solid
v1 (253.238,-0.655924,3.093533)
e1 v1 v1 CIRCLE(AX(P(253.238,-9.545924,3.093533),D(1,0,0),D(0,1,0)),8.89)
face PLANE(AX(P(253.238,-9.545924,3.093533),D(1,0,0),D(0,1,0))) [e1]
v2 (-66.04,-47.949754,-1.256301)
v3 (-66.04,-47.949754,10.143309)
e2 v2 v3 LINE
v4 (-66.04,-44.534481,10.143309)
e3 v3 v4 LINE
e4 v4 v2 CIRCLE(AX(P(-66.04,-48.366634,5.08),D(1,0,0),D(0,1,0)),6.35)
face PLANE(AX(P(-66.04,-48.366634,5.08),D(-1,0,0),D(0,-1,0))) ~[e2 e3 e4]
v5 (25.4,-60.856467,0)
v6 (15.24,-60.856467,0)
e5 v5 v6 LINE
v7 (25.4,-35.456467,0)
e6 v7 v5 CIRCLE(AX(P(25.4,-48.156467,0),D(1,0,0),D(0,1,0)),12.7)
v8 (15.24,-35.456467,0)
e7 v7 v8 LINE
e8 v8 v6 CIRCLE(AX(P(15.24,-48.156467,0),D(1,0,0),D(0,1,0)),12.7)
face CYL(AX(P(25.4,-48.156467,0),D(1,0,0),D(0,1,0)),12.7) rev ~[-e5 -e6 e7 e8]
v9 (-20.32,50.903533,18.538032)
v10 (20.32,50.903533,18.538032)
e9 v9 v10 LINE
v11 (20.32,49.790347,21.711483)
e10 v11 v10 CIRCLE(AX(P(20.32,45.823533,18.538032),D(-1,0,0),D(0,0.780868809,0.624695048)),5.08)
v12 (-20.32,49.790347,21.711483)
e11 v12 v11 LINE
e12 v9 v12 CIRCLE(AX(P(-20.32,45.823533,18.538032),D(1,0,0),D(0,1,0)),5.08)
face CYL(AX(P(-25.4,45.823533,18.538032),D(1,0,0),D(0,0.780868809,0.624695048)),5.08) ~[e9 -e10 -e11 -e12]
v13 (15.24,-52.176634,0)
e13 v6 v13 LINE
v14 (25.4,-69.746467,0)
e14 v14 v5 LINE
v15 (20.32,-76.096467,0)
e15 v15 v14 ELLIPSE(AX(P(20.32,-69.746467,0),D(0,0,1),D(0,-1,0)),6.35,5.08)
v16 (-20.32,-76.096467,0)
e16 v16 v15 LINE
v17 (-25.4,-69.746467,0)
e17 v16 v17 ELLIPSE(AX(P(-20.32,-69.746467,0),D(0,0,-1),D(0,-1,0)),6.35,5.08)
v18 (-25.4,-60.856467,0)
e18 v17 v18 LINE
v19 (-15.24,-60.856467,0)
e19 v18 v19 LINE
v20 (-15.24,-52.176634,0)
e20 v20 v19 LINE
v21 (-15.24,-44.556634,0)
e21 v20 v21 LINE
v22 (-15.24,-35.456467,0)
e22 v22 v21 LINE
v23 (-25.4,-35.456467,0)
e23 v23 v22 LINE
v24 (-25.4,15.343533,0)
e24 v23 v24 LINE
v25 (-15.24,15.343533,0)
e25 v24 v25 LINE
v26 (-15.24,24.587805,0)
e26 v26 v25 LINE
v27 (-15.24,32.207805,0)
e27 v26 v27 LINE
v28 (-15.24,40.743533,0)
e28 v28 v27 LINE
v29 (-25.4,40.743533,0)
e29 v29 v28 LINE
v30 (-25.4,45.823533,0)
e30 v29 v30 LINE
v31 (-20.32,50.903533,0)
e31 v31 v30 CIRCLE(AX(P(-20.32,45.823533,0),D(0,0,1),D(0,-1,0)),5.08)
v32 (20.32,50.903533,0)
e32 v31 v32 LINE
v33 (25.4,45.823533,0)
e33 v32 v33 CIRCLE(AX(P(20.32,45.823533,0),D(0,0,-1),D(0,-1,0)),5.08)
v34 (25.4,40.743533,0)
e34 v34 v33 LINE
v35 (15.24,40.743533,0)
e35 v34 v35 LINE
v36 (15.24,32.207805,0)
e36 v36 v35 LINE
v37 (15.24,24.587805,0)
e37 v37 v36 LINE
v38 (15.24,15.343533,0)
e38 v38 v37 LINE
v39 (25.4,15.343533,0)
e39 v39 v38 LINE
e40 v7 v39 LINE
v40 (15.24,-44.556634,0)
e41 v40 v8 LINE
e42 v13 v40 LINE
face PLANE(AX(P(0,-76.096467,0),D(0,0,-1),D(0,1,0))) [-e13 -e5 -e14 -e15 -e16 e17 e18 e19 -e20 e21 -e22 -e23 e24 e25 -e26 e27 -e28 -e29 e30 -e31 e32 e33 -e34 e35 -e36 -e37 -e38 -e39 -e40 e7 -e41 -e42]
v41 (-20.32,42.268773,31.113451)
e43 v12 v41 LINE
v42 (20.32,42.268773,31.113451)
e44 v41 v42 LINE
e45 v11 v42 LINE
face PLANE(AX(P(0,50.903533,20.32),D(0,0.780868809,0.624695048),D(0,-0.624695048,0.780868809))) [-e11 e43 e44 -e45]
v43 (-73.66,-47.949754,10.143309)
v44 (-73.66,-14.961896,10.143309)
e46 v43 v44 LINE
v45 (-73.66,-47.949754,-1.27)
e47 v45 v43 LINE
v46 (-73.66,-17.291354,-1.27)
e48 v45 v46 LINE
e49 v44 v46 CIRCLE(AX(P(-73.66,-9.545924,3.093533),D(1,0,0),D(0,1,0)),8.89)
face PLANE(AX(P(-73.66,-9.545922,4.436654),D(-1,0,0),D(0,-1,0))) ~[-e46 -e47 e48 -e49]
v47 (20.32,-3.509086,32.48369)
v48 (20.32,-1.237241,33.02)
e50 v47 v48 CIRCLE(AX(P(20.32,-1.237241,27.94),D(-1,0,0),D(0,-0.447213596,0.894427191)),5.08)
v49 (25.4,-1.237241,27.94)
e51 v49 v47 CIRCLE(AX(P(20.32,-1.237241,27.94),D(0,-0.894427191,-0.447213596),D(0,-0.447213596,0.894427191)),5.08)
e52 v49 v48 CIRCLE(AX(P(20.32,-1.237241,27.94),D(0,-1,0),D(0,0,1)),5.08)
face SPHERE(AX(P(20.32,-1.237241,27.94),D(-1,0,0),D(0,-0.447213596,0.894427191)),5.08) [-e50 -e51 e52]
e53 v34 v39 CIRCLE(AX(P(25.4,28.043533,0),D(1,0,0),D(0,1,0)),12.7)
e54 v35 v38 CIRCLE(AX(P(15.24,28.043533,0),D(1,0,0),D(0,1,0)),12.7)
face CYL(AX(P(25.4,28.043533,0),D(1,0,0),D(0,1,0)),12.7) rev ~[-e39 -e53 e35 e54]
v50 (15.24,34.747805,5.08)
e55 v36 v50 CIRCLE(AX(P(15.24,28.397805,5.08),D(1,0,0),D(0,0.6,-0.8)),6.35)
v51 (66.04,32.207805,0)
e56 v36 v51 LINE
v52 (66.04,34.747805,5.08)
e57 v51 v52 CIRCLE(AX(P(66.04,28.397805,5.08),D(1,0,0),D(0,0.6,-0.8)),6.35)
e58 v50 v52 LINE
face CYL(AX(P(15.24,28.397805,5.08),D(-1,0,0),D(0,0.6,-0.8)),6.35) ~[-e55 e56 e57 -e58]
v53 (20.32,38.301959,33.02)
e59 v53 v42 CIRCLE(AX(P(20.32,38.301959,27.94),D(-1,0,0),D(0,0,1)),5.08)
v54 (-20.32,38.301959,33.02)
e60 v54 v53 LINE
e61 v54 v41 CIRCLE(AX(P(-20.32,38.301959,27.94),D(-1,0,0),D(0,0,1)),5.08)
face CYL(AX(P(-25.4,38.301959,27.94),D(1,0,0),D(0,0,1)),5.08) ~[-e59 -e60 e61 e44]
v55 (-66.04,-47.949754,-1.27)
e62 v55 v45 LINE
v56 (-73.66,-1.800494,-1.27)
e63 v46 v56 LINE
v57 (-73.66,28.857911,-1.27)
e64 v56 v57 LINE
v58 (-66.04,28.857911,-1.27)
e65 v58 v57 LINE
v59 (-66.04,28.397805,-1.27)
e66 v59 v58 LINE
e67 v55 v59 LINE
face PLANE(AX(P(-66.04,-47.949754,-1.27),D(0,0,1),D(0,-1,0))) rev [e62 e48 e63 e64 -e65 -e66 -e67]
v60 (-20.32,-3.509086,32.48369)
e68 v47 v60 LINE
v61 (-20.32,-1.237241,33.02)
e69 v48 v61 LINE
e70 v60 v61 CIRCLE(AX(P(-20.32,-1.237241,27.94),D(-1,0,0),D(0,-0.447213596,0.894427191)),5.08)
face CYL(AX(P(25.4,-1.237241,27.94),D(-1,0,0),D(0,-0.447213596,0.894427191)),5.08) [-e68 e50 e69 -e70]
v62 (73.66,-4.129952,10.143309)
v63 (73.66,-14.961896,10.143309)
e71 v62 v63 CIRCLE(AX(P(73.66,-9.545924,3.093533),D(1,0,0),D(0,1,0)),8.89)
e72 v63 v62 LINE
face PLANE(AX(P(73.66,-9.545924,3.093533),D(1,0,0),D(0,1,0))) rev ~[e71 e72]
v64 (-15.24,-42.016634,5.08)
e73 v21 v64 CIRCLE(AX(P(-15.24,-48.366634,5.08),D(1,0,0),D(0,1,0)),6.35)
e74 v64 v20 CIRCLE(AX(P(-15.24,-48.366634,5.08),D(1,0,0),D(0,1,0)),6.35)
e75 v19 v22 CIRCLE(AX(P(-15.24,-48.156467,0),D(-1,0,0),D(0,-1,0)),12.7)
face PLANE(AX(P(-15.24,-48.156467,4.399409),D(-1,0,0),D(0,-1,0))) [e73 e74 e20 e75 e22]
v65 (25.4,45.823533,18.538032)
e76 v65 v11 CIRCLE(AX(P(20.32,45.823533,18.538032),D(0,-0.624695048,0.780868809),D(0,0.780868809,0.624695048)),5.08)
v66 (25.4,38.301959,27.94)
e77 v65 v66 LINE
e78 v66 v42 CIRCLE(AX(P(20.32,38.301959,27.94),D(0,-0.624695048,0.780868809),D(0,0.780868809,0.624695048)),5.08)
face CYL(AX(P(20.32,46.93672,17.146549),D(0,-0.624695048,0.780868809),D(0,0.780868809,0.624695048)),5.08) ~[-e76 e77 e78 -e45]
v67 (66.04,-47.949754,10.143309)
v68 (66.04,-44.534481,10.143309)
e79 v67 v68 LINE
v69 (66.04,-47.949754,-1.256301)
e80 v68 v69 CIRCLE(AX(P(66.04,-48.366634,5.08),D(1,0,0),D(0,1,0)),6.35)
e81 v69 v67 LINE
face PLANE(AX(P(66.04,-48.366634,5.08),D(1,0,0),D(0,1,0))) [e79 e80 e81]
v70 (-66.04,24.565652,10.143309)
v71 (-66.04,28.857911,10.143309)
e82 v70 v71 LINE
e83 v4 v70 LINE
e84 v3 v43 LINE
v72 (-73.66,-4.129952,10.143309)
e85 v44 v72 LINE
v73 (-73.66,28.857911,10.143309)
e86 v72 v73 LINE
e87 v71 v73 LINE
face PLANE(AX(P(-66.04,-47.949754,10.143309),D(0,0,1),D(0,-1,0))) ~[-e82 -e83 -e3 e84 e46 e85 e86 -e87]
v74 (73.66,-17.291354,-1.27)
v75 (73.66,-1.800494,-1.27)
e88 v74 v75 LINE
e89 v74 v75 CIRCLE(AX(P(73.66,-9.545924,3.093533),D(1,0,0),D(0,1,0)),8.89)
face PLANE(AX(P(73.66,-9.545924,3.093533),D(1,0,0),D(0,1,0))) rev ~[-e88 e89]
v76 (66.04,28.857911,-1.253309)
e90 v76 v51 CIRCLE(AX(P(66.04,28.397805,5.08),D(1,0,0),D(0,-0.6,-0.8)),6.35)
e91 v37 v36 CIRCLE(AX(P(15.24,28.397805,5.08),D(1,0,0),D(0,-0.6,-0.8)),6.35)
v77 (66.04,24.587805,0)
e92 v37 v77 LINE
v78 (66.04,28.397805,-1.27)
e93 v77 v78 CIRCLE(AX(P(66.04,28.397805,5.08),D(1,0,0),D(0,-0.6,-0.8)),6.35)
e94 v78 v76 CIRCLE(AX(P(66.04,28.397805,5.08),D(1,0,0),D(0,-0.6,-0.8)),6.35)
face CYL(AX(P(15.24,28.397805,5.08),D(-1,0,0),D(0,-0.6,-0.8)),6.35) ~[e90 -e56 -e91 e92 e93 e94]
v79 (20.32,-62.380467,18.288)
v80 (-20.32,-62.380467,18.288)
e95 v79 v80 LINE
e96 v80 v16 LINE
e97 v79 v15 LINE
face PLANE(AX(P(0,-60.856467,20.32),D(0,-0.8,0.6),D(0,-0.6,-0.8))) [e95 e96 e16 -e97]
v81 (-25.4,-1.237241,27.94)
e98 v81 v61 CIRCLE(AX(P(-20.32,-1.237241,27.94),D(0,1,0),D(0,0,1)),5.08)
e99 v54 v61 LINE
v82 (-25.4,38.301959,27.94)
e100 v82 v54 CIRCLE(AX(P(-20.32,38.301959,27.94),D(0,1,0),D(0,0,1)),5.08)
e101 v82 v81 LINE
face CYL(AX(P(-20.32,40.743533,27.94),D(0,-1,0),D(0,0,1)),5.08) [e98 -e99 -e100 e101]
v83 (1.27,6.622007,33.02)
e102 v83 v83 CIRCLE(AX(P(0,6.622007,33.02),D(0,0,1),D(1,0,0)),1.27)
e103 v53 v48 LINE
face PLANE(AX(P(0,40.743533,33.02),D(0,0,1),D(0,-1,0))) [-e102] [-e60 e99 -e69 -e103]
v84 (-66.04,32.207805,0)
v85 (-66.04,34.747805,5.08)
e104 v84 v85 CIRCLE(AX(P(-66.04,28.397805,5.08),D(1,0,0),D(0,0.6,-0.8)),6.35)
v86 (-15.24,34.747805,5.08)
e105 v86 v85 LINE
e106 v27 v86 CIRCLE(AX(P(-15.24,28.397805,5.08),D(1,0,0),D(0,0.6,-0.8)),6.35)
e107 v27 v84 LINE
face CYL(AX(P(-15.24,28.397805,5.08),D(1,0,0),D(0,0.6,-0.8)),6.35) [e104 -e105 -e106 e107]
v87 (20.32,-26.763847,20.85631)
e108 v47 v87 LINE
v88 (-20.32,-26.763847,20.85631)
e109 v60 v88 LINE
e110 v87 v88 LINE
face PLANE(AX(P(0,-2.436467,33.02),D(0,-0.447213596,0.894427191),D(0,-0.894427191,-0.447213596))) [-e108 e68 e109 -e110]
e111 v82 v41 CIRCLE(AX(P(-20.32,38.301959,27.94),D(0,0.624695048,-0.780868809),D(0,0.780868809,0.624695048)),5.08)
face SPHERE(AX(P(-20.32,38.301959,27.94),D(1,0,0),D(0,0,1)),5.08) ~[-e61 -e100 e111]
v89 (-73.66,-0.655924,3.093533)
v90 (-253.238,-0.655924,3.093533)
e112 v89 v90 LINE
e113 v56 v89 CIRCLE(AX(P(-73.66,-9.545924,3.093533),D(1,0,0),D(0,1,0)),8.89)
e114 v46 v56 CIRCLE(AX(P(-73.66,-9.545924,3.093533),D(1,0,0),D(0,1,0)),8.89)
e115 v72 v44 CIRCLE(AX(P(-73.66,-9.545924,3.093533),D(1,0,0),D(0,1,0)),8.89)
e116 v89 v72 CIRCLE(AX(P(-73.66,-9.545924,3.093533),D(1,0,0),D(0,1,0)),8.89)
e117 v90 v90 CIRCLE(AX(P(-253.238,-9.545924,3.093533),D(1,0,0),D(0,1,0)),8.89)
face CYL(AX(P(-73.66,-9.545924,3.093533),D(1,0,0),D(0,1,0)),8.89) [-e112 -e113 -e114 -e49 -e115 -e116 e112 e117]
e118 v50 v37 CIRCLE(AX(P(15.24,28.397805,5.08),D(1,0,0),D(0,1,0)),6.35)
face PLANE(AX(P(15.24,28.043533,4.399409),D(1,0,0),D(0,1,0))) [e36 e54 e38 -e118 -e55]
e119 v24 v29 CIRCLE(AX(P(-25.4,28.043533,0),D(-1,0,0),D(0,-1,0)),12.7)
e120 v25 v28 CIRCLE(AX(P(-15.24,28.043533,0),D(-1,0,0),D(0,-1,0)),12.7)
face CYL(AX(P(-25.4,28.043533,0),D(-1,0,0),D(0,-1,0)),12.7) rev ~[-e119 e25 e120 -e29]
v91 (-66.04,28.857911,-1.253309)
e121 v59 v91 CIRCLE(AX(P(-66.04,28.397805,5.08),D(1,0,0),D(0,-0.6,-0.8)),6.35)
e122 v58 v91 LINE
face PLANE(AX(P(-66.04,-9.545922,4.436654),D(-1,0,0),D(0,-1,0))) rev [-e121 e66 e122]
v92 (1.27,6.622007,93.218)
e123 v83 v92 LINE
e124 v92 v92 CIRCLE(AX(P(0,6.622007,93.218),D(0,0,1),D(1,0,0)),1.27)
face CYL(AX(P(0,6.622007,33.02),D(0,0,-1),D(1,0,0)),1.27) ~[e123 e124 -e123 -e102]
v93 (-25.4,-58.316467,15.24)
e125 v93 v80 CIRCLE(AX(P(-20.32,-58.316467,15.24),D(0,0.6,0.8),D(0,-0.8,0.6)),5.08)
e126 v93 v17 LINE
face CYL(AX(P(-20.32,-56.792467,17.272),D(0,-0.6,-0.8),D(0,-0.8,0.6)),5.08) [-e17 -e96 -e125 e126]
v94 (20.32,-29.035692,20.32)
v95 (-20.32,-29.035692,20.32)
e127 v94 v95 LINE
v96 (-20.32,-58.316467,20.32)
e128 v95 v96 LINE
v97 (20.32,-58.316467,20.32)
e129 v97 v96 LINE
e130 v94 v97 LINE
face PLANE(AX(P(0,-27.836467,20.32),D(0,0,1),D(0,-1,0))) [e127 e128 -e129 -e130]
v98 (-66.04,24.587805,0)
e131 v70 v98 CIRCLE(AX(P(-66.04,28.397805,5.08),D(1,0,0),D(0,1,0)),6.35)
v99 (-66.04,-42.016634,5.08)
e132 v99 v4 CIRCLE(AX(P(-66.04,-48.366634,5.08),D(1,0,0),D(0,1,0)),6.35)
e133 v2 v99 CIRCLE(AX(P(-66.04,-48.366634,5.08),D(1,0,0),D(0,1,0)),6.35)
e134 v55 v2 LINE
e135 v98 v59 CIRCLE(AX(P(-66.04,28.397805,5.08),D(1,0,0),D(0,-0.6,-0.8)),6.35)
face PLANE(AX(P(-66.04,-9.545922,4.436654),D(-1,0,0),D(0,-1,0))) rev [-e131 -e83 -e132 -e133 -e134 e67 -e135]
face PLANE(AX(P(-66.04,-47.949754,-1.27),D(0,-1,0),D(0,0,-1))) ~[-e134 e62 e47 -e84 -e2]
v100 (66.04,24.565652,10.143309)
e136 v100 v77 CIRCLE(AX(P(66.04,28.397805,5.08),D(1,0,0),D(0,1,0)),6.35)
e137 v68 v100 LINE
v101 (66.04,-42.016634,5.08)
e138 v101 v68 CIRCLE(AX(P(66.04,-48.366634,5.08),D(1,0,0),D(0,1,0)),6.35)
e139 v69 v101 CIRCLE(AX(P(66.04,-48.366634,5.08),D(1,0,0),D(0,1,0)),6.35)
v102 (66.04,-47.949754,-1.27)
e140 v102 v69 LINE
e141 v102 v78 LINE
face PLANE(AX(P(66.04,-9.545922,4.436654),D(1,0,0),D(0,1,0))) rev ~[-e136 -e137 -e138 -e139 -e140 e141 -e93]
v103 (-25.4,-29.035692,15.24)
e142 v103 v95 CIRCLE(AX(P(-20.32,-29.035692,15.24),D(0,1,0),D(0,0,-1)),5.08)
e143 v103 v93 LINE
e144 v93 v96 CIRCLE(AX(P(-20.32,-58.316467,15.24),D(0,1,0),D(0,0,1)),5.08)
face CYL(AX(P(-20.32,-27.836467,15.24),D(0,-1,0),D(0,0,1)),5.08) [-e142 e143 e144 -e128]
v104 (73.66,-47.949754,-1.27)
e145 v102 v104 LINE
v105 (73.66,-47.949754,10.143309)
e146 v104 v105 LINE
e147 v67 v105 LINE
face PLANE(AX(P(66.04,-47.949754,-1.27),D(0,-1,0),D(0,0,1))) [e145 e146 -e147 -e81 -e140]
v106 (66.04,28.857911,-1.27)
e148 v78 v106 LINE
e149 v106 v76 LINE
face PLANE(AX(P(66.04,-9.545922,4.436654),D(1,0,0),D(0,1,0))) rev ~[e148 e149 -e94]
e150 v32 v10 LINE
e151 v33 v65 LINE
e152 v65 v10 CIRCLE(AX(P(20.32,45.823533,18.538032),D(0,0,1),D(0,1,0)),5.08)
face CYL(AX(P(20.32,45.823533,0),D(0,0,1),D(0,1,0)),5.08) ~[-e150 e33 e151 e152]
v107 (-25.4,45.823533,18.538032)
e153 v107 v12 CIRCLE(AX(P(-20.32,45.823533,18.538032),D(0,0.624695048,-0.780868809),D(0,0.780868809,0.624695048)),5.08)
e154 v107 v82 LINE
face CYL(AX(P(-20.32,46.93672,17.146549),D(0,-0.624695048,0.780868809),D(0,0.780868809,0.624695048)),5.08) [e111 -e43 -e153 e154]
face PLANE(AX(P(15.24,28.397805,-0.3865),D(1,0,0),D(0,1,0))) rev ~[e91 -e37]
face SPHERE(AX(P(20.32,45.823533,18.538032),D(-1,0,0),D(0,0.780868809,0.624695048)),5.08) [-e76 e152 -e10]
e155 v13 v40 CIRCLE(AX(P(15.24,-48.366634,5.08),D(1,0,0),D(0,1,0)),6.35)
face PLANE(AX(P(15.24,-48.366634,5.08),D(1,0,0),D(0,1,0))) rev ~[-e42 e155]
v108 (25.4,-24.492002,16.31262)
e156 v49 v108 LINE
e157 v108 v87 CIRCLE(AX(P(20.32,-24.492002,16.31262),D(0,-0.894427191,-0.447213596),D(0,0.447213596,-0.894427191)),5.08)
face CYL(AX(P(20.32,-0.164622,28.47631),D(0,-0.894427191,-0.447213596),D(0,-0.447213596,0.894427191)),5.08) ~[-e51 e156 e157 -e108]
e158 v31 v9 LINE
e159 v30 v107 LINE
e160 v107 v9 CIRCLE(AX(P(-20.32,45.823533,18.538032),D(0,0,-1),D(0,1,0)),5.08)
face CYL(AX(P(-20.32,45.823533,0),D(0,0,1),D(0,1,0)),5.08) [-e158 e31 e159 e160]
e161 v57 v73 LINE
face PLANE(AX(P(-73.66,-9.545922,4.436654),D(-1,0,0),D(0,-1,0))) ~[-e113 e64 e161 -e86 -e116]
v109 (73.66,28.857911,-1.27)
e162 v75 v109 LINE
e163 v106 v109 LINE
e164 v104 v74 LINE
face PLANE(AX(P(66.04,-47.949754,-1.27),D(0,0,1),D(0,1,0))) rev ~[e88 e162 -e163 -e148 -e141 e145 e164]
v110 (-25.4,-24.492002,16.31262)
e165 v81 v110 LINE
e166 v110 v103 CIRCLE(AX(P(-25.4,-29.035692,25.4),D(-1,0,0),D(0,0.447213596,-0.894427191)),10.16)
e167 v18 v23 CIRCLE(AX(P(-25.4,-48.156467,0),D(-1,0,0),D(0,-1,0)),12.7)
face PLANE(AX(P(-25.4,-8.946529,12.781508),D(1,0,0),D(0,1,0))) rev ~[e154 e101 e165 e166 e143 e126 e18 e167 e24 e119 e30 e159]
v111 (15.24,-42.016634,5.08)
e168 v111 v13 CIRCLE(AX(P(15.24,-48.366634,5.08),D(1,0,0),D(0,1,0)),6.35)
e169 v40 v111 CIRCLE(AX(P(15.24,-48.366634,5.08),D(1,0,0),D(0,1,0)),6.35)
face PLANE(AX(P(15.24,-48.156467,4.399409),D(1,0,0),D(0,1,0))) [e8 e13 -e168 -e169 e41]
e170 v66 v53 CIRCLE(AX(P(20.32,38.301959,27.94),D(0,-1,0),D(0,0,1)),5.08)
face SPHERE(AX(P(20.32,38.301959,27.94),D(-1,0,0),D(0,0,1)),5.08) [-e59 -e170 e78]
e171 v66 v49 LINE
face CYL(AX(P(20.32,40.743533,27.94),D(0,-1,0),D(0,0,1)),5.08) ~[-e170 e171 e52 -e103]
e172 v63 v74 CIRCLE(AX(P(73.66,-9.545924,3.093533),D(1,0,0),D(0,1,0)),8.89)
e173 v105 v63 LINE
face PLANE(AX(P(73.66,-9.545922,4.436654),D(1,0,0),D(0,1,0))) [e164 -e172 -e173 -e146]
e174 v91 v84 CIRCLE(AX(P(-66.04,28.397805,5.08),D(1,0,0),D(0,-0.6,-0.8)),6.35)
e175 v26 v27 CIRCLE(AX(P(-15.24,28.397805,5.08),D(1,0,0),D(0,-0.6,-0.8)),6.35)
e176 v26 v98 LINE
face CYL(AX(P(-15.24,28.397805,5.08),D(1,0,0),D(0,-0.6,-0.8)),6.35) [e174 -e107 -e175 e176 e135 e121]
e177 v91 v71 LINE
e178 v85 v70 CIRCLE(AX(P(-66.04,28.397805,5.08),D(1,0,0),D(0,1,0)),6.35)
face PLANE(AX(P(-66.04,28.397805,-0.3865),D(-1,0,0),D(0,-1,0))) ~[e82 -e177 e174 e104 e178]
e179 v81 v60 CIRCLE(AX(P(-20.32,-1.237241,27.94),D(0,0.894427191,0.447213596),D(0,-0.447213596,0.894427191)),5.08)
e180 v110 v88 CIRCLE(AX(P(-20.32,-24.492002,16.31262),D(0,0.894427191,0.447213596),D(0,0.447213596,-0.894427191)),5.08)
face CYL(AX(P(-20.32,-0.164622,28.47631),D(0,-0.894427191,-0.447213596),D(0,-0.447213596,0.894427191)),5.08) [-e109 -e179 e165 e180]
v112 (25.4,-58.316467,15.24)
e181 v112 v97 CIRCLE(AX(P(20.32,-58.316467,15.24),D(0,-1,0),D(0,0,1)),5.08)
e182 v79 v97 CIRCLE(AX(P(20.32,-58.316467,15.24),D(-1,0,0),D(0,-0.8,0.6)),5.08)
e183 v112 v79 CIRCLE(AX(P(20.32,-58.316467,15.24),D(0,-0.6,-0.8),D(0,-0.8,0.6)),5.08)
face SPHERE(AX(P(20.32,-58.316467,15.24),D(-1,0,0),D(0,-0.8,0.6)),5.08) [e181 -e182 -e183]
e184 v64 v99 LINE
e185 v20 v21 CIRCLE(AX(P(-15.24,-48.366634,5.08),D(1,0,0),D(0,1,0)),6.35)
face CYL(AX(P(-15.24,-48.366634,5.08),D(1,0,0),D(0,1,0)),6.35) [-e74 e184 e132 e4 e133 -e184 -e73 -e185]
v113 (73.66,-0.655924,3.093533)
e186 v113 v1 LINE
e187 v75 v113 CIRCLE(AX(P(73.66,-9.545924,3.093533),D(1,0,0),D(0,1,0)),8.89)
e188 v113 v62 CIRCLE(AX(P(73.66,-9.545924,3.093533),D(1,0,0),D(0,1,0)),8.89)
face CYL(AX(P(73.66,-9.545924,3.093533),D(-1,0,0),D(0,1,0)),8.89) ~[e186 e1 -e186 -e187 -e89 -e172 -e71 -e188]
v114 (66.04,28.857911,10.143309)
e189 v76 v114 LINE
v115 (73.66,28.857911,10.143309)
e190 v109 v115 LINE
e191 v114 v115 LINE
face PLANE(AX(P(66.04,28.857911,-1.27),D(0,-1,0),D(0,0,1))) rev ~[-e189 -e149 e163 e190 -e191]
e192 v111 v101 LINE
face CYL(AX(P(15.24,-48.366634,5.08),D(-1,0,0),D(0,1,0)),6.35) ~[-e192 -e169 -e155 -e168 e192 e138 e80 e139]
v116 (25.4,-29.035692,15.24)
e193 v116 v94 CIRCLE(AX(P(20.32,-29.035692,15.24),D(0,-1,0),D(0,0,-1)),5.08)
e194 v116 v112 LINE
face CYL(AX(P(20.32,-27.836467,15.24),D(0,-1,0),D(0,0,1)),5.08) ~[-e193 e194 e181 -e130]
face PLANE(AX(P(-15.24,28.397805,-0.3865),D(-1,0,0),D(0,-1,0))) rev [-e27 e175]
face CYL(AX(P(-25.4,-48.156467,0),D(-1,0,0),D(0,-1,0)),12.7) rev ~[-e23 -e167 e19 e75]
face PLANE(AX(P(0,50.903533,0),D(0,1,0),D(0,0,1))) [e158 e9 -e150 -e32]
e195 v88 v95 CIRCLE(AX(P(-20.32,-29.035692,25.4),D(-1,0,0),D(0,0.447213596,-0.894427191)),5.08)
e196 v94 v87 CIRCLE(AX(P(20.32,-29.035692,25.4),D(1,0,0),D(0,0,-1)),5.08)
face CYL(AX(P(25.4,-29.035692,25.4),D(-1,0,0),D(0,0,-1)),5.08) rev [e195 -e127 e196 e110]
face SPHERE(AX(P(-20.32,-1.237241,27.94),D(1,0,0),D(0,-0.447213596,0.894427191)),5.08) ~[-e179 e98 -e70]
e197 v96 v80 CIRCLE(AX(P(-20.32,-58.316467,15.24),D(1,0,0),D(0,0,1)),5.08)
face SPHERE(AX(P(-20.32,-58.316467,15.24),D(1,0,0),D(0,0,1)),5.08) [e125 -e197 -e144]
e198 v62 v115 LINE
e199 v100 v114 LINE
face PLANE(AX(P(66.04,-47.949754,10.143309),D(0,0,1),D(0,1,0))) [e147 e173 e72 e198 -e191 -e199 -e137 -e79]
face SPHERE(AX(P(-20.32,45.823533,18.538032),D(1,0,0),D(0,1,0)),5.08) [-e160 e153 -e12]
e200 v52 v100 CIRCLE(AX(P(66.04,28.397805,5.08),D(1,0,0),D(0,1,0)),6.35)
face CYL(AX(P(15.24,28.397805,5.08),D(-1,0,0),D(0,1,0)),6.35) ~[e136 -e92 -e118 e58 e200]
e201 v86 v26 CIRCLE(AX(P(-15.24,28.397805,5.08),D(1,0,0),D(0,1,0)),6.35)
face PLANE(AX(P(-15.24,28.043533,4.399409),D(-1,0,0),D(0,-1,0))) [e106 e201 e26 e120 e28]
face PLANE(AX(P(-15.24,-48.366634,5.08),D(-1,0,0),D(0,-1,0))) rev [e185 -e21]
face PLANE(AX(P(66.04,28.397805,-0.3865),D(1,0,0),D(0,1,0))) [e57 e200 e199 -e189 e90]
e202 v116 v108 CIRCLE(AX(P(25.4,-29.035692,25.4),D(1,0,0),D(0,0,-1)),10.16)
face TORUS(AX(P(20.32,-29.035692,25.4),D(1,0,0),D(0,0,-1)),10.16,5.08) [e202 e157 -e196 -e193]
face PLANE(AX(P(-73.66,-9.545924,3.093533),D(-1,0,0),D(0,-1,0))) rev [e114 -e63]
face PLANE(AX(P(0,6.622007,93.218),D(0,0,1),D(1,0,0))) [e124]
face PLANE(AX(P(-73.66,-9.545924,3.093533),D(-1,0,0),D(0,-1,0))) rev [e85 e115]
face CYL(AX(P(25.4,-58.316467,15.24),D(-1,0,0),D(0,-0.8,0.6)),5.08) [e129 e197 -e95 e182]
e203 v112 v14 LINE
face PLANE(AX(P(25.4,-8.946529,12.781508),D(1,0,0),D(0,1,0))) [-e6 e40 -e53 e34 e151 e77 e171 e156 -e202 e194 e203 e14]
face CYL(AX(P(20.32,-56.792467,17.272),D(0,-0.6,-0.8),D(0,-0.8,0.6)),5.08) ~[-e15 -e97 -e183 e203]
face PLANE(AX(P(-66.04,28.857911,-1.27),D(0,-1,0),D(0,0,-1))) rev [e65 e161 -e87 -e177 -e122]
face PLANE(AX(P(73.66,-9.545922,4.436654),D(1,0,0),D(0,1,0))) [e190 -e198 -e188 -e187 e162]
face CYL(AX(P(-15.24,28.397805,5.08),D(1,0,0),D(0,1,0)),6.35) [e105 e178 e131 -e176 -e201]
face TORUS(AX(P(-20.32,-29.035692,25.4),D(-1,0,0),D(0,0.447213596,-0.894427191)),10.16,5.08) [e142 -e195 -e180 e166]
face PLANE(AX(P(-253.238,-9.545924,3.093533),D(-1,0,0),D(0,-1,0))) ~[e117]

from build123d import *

# Parameters (mm, degrees)
F1_DEPTH  = 25.4
F2_R      = 5.08
F4_DEPTH  = 10.16
F6_DEPTH  = 10.16
F7_R      = 6.35
F8_DEPTH  = 50.8
F10_W     = 76.8076643543
F10_H     = 11.4133090087
F11_DEPTH = 7.62
F13_R     = 8.89
F14_DEPTH = 179.578
F16_R     = 1.27
F17_DEPTH = 60.198


# Not quite as in the source:
# - a feature names something its author has since deleted; it is built from what else it names


with BuildPart() as f1:
    # F0 (on Right) → F1 (new body, symmetric)
    with BuildSketch(Plane.YZ):
        Polygon((-60.8564667081, 20.32), (-76.0964667081, 0), (50.9035332919, 0), (50.9035332919, 20.32), (40.7435332919, 33.02), (-2.4364667081, 33.02), (-27.8364667081, 20.32), align=None)
    extrude(amount=F1_DEPTH, both=True)

    # F2
    f2_edges = [f1.edges().sort_by_distance(p)[0] for p in [
        (25.4, -68.476467, 10.16),
        (25.4, -44.346467, 20.32),
        (25.4, -15.136467, 26.67),
        (25.4, 19.153533, 33.02),
        (25.4, 45.823533, 26.67),
        (25.4, 50.903533, 10.16),
        (0, 50.903533, 20.32),
        (0, 40.743533, 33.02),
        (0, -60.856467, 20.32),
        (0, -27.836467, 20.32),
        (0, -2.436467, 33.02),
        (-25.4, -15.136467, 26.67),
        (-25.4, -44.346467, 20.32),
        (-25.4, -68.476467, 10.16),
        (-25.4, 19.153533, 33.02),
        (-25.4, 50.903533, 10.16),
        (-25.4, 45.823533, 26.67),
    ]]
    fillet(f2_edges, radius=F2_R)

    # F3 (on face) → F4 (cut)
    with BuildSketch(Plane.YZ.offset(25.4)):
        with BuildLine():
            Line((-60.8564667081, 0), (-35.4564667081, 0))
            ThreePointArc((-35.4564667081, 0), (-48.1564667081, 12.7), (-60.8564667081, 0))
        make_face()
        with BuildLine():
            ThreePointArc((40.7435332919, 0), (28.0435332919, 12.7), (15.3435332919, 0))
            Line((15.3435332919, 0), (40.7435332919, 0))
        make_face()
    extrude(amount=-F4_DEPTH, mode=Mode.SUBTRACT)

    # F5 (on face) → F6 (cut)
    with BuildSketch(Plane(origin=(-25.4, 0, 0), x_dir=(0, -1, 0), z_dir=(-1, 0, 0))):
        with BuildLine():
            Line((-40.7435332919, 0), (-15.3435332919, 0))
            ThreePointArc((-15.3435332919, 0), (-28.0435332919, 12.7), (-40.7435332919, 0))
        make_face()
        with BuildLine():
            Line((35.4564667081, 0), (60.8564667081, 0))
            ThreePointArc((60.8564667081, 0), (48.1564667081, 12.7), (35.4564667081, 0))
        make_face()
    extrude(amount=-F6_DEPTH, mode=Mode.SUBTRACT)

    # F7 (on face) → F8 (join)
    with BuildSketch(Plane.YZ.offset(15.24)):
        with BuildLine():
            Line((32.2078052294, 0), (24.5878052294, 0))
            ThreePointArc((24.5878052294, 0), (28.3978052294, -1.27), (32.2078052294, 0))
        make_face()
        with Locations((-48.3666342305, 5.08)):
            Circle(F7_R)
        with BuildLine():
            ThreePointArc((32.2078052294, 0), (34.0774178922, 2.2401936686), (34.7478052294, 5.08))
            ThreePointArc((34.7478052294, 5.08), (25.5579988979, 10.7596126628), (24.5878052294, 0))
            Line((24.5878052294, 0), (32.2078052294, 0))
        make_face()
    extrude(amount=F8_DEPTH)

    # F9: F1 across plane


with BuildPart() as f1_1:
    add(f1.part)
    add(f1.part.mirror(Plane.YZ))

    # F10 (on face) → F11 (join)
    with BuildSketch(Plane.YZ.offset(66.04)):
        with Locations((-9.5459215246, 4.4366544964)):
            Rectangle(F10_W, F10_H)
    extrude(amount=F11_DEPTH)

    # F12: F1 across plane


with BuildPart() as f1_2:
    add(f1_1.part)
    add(f1_1.part.mirror(Plane.YZ))

    # F13 (on face) → F14 (join)
    with BuildSketch(Plane.YZ.offset(73.66)):
        with Locations((-9.5459241474, 3.0935325194)):
            Circle(F13_R)
    extrude(amount=F14_DEPTH)

    # F15: F1 across plane


with BuildPart() as f1_3:
    add(f1_2.part)
    add(f1_2.part.mirror(Plane.YZ))

    # F16 (on face) → F17 (join)
    with BuildSketch(Plane.XY.offset(33.02)):
        with Locations((0, 6.6220072263)):
            Circle(F16_R)
    extrude(amount=F17_DEPTH)


solid = f1_3.part
